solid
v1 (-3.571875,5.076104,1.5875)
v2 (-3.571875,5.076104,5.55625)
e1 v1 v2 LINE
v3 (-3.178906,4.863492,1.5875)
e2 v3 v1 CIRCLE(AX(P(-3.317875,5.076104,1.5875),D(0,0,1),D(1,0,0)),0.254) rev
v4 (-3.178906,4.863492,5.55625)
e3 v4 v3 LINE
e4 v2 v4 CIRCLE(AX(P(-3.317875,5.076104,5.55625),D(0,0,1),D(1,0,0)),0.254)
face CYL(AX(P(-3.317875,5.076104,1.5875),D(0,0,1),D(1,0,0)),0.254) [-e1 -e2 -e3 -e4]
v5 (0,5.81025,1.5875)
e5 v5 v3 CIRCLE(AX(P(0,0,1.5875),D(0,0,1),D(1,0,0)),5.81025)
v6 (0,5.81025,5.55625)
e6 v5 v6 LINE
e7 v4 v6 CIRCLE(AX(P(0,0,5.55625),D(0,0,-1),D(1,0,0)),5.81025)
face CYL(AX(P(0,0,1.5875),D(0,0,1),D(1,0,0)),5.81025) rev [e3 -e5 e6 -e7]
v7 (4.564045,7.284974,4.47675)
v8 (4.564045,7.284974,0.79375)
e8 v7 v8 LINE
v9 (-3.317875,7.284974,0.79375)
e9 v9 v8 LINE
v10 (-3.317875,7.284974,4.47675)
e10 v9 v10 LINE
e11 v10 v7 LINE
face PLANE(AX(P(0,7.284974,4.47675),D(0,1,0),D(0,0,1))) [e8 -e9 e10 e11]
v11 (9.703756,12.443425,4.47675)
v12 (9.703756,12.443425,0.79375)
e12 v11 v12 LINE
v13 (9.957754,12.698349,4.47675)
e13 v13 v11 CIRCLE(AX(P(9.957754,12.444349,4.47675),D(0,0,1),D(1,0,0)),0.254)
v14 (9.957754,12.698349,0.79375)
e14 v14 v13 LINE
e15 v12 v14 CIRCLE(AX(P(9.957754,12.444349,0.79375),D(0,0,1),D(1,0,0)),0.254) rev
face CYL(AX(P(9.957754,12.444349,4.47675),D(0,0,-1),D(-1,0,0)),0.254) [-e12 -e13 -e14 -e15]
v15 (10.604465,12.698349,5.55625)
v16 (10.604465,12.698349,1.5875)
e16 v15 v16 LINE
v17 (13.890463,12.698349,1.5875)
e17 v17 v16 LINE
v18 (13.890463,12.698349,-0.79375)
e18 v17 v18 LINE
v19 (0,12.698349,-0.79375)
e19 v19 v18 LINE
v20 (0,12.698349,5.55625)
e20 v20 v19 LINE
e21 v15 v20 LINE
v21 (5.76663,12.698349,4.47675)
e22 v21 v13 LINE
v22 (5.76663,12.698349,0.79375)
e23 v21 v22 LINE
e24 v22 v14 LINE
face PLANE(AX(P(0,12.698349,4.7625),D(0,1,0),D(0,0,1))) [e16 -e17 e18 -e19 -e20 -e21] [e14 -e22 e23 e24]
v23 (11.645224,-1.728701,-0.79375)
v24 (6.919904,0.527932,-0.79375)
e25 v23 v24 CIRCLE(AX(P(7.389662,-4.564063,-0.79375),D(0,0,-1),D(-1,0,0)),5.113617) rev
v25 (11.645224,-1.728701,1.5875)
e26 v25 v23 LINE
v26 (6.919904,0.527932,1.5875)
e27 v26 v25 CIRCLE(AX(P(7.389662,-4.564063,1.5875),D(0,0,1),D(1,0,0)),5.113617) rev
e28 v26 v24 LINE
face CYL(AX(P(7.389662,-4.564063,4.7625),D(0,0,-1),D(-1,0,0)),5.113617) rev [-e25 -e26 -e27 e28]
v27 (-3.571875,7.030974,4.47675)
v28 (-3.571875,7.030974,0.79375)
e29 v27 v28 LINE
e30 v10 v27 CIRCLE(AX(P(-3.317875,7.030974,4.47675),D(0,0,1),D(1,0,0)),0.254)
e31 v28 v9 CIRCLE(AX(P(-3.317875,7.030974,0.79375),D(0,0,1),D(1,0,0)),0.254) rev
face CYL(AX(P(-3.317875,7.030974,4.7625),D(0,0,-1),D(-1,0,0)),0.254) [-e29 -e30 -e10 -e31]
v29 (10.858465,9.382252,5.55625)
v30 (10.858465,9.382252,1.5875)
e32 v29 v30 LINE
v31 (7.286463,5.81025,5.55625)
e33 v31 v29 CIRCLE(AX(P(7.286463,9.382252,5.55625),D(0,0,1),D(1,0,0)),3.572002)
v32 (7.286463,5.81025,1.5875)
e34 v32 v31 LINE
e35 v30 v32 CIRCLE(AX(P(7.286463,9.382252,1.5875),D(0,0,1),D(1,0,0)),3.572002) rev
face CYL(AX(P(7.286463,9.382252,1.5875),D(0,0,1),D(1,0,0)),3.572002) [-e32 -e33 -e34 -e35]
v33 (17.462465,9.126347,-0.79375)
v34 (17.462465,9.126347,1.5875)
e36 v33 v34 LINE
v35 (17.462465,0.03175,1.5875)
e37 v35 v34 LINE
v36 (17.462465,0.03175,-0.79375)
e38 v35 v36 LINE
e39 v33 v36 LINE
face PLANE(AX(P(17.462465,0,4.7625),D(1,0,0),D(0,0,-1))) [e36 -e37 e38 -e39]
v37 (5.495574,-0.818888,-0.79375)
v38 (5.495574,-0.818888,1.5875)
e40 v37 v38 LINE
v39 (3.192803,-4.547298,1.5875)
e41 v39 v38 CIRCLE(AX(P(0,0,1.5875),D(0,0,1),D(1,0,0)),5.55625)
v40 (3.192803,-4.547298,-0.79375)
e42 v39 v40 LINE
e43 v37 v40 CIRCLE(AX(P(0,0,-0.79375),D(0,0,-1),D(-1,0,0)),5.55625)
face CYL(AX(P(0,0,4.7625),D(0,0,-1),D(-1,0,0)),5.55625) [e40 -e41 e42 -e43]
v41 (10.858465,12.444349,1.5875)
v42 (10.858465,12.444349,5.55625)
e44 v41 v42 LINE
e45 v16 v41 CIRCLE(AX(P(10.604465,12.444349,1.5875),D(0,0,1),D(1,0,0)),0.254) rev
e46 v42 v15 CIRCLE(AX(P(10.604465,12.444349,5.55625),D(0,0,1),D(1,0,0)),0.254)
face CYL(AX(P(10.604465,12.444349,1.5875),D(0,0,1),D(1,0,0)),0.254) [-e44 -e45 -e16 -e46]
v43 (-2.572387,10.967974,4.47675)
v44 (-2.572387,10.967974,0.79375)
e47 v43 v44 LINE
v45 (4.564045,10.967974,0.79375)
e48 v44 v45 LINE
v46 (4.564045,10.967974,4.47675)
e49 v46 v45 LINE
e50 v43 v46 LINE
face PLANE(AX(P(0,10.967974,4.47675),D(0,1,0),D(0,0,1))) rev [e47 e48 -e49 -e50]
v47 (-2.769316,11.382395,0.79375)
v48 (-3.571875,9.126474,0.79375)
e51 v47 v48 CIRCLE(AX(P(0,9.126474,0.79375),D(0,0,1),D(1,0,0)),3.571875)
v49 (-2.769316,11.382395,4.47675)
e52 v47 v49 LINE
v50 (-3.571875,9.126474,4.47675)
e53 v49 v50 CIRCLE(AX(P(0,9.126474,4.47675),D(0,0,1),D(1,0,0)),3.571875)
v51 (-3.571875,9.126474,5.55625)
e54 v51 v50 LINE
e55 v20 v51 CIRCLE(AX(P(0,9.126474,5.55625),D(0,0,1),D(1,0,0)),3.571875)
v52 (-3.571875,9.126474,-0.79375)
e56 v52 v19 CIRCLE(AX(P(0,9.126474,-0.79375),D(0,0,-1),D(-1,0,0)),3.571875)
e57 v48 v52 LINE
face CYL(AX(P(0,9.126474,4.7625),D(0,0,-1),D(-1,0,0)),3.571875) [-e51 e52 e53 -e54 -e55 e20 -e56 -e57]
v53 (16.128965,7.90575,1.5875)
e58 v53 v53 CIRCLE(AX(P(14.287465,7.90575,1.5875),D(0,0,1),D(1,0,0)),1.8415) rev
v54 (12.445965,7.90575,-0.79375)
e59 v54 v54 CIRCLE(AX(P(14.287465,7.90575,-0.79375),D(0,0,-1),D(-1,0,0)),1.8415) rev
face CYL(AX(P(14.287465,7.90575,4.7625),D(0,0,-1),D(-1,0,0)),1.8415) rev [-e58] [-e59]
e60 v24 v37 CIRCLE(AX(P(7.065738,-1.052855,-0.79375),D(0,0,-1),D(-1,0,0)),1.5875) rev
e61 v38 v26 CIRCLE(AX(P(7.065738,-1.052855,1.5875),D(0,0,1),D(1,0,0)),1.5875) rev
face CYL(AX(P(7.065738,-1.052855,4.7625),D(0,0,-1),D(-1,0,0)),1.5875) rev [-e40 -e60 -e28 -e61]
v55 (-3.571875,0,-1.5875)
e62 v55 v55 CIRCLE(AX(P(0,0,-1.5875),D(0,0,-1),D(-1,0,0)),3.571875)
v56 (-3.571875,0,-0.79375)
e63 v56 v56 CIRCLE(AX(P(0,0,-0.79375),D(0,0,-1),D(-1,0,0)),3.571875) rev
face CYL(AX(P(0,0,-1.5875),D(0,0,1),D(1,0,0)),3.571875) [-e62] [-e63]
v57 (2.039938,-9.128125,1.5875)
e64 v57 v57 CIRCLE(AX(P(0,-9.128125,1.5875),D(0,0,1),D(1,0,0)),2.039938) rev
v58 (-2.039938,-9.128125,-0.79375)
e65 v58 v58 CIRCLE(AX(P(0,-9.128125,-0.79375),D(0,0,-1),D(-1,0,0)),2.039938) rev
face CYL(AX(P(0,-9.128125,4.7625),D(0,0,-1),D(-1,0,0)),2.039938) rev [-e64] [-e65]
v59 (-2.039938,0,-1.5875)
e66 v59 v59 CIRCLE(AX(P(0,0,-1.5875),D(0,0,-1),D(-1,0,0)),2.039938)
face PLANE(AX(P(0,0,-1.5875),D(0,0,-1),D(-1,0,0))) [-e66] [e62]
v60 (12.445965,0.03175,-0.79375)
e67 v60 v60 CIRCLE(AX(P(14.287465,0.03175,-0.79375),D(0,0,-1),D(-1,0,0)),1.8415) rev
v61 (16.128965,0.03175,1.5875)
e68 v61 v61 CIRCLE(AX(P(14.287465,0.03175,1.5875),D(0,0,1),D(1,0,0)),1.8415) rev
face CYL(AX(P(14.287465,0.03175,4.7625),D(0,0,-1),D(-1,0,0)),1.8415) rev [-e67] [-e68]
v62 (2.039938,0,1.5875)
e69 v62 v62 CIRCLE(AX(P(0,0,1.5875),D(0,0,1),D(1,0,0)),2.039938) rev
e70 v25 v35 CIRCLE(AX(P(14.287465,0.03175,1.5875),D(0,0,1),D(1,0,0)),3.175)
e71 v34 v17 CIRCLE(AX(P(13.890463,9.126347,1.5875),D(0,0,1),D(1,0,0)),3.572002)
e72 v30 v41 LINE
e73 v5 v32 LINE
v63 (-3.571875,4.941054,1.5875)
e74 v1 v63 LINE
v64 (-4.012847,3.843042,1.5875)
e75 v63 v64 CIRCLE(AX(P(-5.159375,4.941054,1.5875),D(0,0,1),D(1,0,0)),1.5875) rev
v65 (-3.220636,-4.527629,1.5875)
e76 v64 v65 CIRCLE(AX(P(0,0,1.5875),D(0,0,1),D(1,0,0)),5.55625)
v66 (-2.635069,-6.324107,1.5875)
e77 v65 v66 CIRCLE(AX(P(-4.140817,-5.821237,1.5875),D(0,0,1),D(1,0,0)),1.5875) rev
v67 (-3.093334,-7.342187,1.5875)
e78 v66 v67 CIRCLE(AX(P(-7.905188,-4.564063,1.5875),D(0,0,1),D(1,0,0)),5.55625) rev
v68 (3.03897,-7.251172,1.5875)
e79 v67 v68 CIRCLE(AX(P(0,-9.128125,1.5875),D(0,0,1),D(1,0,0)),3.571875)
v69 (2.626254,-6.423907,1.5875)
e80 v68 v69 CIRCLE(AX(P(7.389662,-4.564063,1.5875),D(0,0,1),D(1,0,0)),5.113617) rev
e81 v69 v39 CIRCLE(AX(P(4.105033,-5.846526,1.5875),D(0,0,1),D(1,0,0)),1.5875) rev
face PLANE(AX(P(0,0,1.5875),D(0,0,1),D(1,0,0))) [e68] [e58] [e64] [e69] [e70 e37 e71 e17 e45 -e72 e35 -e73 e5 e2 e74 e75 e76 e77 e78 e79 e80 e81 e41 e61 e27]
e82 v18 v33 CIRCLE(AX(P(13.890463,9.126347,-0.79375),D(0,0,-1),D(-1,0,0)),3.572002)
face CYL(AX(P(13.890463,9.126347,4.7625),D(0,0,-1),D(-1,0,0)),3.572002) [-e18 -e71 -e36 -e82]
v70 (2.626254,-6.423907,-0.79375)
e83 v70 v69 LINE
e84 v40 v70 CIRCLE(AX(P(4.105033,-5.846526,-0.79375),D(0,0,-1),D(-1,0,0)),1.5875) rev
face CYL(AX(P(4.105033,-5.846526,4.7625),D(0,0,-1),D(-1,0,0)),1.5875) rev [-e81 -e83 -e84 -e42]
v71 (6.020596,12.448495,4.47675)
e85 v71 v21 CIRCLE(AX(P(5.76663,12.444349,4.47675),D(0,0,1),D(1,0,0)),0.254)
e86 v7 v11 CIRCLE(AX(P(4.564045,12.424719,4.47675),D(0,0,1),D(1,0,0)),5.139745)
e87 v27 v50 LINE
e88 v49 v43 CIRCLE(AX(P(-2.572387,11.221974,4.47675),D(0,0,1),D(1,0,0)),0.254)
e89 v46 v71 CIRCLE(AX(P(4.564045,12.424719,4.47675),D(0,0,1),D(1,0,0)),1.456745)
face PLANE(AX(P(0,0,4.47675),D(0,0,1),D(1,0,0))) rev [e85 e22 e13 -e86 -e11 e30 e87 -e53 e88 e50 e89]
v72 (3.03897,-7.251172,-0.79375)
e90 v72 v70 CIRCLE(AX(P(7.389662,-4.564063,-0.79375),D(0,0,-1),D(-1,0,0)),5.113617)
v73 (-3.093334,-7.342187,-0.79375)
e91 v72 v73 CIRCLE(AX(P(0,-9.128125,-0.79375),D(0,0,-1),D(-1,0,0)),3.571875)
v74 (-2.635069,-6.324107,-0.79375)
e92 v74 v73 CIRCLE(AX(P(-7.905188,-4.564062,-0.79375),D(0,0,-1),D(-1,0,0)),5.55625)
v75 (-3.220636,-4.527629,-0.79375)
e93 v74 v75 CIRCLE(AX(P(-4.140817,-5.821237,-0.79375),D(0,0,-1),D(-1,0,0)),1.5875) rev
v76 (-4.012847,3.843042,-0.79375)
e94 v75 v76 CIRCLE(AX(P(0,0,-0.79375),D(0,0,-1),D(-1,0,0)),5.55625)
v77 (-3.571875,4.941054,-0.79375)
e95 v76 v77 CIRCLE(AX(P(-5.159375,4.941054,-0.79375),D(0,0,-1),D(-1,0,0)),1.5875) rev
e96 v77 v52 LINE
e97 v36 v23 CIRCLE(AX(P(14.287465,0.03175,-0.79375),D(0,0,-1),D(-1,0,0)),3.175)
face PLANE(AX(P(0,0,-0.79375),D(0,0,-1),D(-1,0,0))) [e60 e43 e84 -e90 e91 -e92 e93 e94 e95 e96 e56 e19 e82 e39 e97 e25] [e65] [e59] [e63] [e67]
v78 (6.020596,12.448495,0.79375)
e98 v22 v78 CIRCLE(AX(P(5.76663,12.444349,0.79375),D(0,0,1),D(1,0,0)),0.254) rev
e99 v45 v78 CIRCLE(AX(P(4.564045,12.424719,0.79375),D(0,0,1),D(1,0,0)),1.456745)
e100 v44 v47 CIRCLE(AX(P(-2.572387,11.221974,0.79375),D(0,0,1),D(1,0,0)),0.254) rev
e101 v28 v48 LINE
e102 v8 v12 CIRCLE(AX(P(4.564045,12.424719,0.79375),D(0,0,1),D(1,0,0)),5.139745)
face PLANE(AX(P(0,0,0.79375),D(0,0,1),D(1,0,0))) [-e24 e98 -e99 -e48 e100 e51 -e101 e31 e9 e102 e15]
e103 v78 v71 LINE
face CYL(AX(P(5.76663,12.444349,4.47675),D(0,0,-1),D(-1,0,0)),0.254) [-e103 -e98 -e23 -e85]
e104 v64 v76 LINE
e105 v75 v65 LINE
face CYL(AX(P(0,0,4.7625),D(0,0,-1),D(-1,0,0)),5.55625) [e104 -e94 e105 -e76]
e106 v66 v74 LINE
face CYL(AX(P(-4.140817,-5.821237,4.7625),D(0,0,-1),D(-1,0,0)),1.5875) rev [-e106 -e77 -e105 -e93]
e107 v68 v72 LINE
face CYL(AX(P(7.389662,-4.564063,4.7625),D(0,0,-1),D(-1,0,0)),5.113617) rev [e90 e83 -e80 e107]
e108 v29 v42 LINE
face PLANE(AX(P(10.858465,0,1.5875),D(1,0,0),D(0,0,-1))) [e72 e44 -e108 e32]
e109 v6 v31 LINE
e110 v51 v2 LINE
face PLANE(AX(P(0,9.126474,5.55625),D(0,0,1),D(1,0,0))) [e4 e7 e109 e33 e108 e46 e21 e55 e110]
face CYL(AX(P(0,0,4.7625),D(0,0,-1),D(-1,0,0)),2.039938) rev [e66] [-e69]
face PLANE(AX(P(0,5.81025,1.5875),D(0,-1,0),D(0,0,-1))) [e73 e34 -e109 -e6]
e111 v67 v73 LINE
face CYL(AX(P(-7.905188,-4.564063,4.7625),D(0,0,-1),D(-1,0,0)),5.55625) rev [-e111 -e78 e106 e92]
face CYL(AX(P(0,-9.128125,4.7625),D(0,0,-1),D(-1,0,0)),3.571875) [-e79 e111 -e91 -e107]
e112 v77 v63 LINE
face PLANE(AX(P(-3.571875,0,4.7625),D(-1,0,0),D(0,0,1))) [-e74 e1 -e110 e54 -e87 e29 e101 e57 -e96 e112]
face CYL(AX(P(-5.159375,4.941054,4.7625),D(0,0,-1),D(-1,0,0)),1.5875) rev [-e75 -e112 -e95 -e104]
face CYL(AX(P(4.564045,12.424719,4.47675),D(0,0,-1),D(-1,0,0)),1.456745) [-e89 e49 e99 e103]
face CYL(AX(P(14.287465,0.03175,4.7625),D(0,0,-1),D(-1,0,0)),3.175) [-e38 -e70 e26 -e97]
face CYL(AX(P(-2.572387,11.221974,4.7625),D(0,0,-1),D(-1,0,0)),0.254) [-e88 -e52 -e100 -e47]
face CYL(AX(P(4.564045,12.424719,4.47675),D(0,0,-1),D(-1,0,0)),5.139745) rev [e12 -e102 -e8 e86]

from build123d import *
from build123d.topology import SkipClean

# Parameters (mm, degrees)
SKETCH2_R                 = 2.0399375
SKETCH2_R_2               = 1.8415
BOSS_EXTRUDE1_DEPTH       = 4.7625
CUT_EXTRUDE1_START        = -3.175
SKETCH5_R                 = 2.0399375
SKETCH5_R_2               = 1.8415
CUT_EXTRUDE1_DEPTH        = 3.175
CUT_EXTRUDE2_START        = 0.79375
CUT_EXTRUDE2_DEPTH        = 3.683
BOSS_EXTRUDE2_START       = 1.5875
SKETCH6_R                 = 3.571875
SKETCH6_R_2               = 2.0399375
BOSS_EXTRUDE2_DEPTH       = 1.5875
BOSS_EXTRUDE3_OUTLINE_R   = 2.0399375
BOSS_EXTRUDE3_OUTLINE_R_2 = 1.8415
BOSS_EXTRUDE3_OUTLINE_R_3 = 3.571875
BOSS_EXTRUDE3_DEPTH       = 0.79375
BOSS_EXTRUDE4_DEPTH       = 0.79375
FILLET1_R                 = 3.572002
FILLET2_R                 = 0.254
FILLET3_R                 = 1.5875


# Read off the part's stored shape, not the designer's step: Boss-Extrude3
with BuildPart() as part:
    # Sketch2 → Boss-Extrude1 (new body)
    with BuildSketch(Plane.XY):
        with BuildLine():
            Line((17.462464722, 12.698349), (0, 12.698349))
            ThreePointArc((0, 12.698349), (-2.525697034, 11.652171034), (-3.571875, 9.126474))
            Line((-3.571875, 9.126474), (-3.571875, 4.256010226))
            ThreePointArc((-3.571875, 4.256010226), (-5.510115516, -0.714521565), (-2.368197689, -5.02628628))
            ThreePointArc((-2.368197689, -5.02628628), (-2.602783662, -6.224309717), (-3.093334465, -7.342187459))
            ThreePointArc((-3.093334465, -7.342187459), (0.053006227, -12.699606675), (3.038971631, -7.251174697))
            ThreePointArc((3.038971631, -7.251174697), (2.543740299, -6.196888698), (2.299944817, -5.05788176))
            ThreePointArc((2.299944817, -5.05788176), (4.727286579, -2.919704723), (5.552352254, 0.208082946))
            ThreePointArc((5.552352254, 0.208082946), (8.938780729, 0.309264009), (11.645223776, -1.728701017))
            ThreePointArc((11.645223776, -1.728701017), (15.207114111, -3.007142891), (17.462464722, 0.03175))
            Line((17.462464722, 0.03175), (17.462464722, 12.698349))
        make_face()
        with Locations((0, -9.128125)):
            Circle(SKETCH2_R, mode=Mode.SUBTRACT)
        Circle(SKETCH2_R, mode=Mode.SUBTRACT)
        with Locations((14.287464722, 0.03175)):
            Circle(SKETCH2_R_2, mode=Mode.SUBTRACT)
        with Locations((14.287464722, 7.90575)):
            Circle(SKETCH2_R_2, mode=Mode.SUBTRACT)
    extrude(amount=BOSS_EXTRUDE1_DEPTH)

    # Sketch5 → Cut-Extrude1 (cut)
    with BuildSketch(Plane.XY.offset(4.7625).offset(CUT_EXTRUDE1_START)):
        with BuildLine():
            Line((10.858464722, 12.698349), (10.858464722, 11.08075))
            Line((10.858464722, 11.08075), (10.858464722, 5.81025))
            Line((10.858464722, 5.81025), (0, 5.81025))
            ThreePointArc((0, 5.81025), (-1.88847054, 5.494786991), (-3.571875, 4.582653603))
            Line((-3.571875, 4.582653603), (-3.571875, 4.256010226))
            ThreePointArc((-3.571875, 4.256010226), (-5.510115516, -0.714521565), (-2.368197689, -5.02628628))
            ThreePointArc((-2.368197689, -5.02628628), (-2.602783664, -6.224309725), (-3.093334473, -7.342187472))
            ThreePointArc((-3.093334473, -7.342187472), (0.053006235, -12.699606675), (3.038971631, -7.251174697))
            ThreePointArc((3.038971631, -7.251174697), (2.543740299, -6.196888698), (2.299944817, -5.05788176))
            ThreePointArc((2.299944817, -5.05788176), (4.727286579, -2.919704723), (5.552352254, 0.208082946))
            ThreePointArc((5.552352254, 0.208082946), (8.938780739, 0.309264006), (11.645223789, -1.728701036))
            ThreePointArc((11.645223801, -1.728701054), (15.207114132, -3.007142884), (17.462464722, 0.03175))
            Line((17.462464722, 0.03175), (17.462464722, 12.698349))
            Line((17.462464722, 12.698349), (10.858464722, 12.698349))
        make_face()
        with Locations((0, -9.128125)):
            Circle(SKETCH5_R, mode=Mode.SUBTRACT)
        Circle(SKETCH5_R, mode=Mode.SUBTRACT)
        with Locations((14.287464722, 0.03175)):
            Circle(SKETCH5_R_2, mode=Mode.SUBTRACT)
        with Locations((14.287464722, 7.90575)):
            Circle(SKETCH5_R_2, mode=Mode.SUBTRACT)
    extrude(amount=CUT_EXTRUDE1_DEPTH, mode=Mode.SUBTRACT)

    # Sketch3 → Cut-Extrude2 (cut)
    with BuildSketch(Plane.XY.offset(CUT_EXTRUDE2_START)):
        with BuildLine():
            Line((-0.364938051, 10.967974), (-3.571875, 10.967974))
            Line((-3.571875, 10.967974), (-3.571875, 7.284974))
            Line((-3.571875, 7.284974), (4.564044861, 7.284974))
            ThreePointArc((4.564044861, 7.284974), (1.487546789, 8.307421556), (-0.364938051, 10.967974))
        make_face()
        with BuildLine():
            Line((4.564044861, 10.967974), (-0.364938051, 10.967974))
            ThreePointArc((-0.364938051, 10.967974), (1.487546789, 8.307421556), (4.564044861, 7.284974))
            Line((4.564044861, 7.284974), (4.564044861, 10.967974))
        make_face()
        with BuildLine():
            ThreePointArc((6.020789845, 12.424718984), (5.594119118, 11.394644727), (4.564044861, 10.967974))
            Line((4.564044861, 10.967974), (4.564044861, 7.284974))
            ThreePointArc((4.564044861, 7.284974), (8.198393393, 8.790370452), (9.703789845, 12.424718984))
            ThreePointArc((9.703789845, 12.424718984), (9.701967288, 12.561582524), (9.696500912, 12.698349))
            Line((9.696500912, 12.698349), (5.99486021, 12.698349))
            ThreePointArc((5.99486021, 12.698349), (6.014292948, 12.562146903), (6.020789845, 12.424718984))
        make_face()
    extrude(amount=CUT_EXTRUDE2_DEPTH, mode=Mode.SUBTRACT)

    # Sketch6 → Boss-Extrude2 (add)
    with SkipClean():  # the faces are left unmerged after this step: merging them gives an invalid solid
        with BuildSketch(Plane(origin=(0, 0, 0), x_dir=(-1, 0, 0), z_dir=(0, 0, -1)).offset(BOSS_EXTRUDE2_START)):
            with Locations(Location((0, 0, 0), (0, 0, 180))):
                Circle(SKETCH6_R)
            Circle(SKETCH6_R_2, mode=Mode.SUBTRACT)
        extrude(amount=-BOSS_EXTRUDE2_DEPTH)

    # Boss-Extrude3 outline → Boss-Extrude3 (add)
    with BuildSketch(Plane(origin=(0, 0, 0), x_dir=(-1, 0, 0), z_dir=(0, 0, -1))):
        with BuildLine():
            ThreePointArc((3.093334489, -7.3421875), (2.602783669, -6.22430974), (2.368197689, -5.02628628))
            ThreePointArc((2.368197689, -5.02628628), (5.510115516, -0.714521565), (3.571875, 4.256010226))
            Line((3.571875, 4.256010226), (3.571875, 9.126474))
            ThreePointArc((3.571875, 9.126474), (2.525697034, 11.652171034), (0, 12.698349))
            Line((0, 12.698349), (-17.462464722, 12.698349))
            Line((-17.462464722, 12.698349), (-17.462464722, 0.03175))
            ThreePointArc((-17.462464722, 0.03175), (-15.207114132, -3.007142884), (-11.645223801, -1.728701054))
            ThreePointArc((-11.645223801, -1.728701054), (-8.93878075, 0.309264003), (-5.552352254, 0.208082946))
            ThreePointArc((-5.552352254, 0.208082946), (-4.727286579, -2.919704723), (-2.299944817, -5.05788176))
            ThreePointArc((-2.299944817, -5.05788176), (-2.543739786, -6.196887176), (-3.038969943, -7.251171964))
            ThreePointArc((-3.038969943, -7.251171964), (-0.053007857, -12.699606651), (3.093334489, -7.3421875))
        make_face()
        with Locations((0, -9.128125)):
            Circle(BOSS_EXTRUDE3_OUTLINE_R, mode=Mode.SUBTRACT)
        with Locations((-14.287464722, 0.03175)):
            Circle(BOSS_EXTRUDE3_OUTLINE_R_2, mode=Mode.SUBTRACT)
        with Locations((-14.287464722, 7.90575)):
            Circle(BOSS_EXTRUDE3_OUTLINE_R_2, mode=Mode.SUBTRACT)
        Circle(BOSS_EXTRUDE3_OUTLINE_R_3, mode=Mode.SUBTRACT)
    extrude(amount=BOSS_EXTRUDE3_DEPTH)

    # Sketch8 → Boss-Extrude4 (add)
    with BuildSketch(Plane.XY.offset(4.7625)):
        with BuildLine():
            Line((-3.571875, 9.126474), (-3.571875, 4.582653603))
            ThreePointArc((-3.571875, 4.582653603), (-1.88847054, 5.494786991), (0, 5.81025))
            Line((0, 5.81025), (10.858464722, 5.81025))
            Line((10.858464722, 5.81025), (10.858464722, 12.698349))
            Line((10.858464722, 12.698349), (0, 12.698349))
            ThreePointArc((0, 12.698349), (-2.525697034, 11.652171034), (-3.571875, 9.126474))
        make_face()
    extrude(amount=BOSS_EXTRUDE4_DEPTH)

    # Fillet1
    fillet1_edges = [part.edges().sort_by_distance(p)[0] for p in [
        (17.462464722, 12.698349, 0.79375),
        (10.858464722, 5.81025, 3.571875),
    ]]
    fillet(fillet1_edges, radius=FILLET1_R)

    # Fillet2
    fillet2_edges = [part.edges().sort_by_distance(p)[0] for p in [
        (-3.060583076, 10.967974, 2.63525),
        (-3.571875, 7.284974, 2.63525),
        (9.696500912, 12.698349, 2.63525),
        (5.99486021, 12.698349, 2.63525),
        (10.858464722, 12.698349, 3.571875),
        (-3.571875, 4.582653603, 3.571875),
    ]]
    fillet(fillet2_edges, radius=FILLET2_R)

    # Fillet3
    fillet3_edges = [part.edges().sort_by_distance(p)[0] for p in [
        (5.552352254, 0.208082946, 0.79375),
        (2.299944817, -5.05788176, 0.79375),
        (-2.368197689, -5.02628628, 0.79375),
        (-3.571875, 4.256010226, 0.79375),
    ]]
    fillet(fillet3_edges, radius=FILLET3_R)


solid = part.part
